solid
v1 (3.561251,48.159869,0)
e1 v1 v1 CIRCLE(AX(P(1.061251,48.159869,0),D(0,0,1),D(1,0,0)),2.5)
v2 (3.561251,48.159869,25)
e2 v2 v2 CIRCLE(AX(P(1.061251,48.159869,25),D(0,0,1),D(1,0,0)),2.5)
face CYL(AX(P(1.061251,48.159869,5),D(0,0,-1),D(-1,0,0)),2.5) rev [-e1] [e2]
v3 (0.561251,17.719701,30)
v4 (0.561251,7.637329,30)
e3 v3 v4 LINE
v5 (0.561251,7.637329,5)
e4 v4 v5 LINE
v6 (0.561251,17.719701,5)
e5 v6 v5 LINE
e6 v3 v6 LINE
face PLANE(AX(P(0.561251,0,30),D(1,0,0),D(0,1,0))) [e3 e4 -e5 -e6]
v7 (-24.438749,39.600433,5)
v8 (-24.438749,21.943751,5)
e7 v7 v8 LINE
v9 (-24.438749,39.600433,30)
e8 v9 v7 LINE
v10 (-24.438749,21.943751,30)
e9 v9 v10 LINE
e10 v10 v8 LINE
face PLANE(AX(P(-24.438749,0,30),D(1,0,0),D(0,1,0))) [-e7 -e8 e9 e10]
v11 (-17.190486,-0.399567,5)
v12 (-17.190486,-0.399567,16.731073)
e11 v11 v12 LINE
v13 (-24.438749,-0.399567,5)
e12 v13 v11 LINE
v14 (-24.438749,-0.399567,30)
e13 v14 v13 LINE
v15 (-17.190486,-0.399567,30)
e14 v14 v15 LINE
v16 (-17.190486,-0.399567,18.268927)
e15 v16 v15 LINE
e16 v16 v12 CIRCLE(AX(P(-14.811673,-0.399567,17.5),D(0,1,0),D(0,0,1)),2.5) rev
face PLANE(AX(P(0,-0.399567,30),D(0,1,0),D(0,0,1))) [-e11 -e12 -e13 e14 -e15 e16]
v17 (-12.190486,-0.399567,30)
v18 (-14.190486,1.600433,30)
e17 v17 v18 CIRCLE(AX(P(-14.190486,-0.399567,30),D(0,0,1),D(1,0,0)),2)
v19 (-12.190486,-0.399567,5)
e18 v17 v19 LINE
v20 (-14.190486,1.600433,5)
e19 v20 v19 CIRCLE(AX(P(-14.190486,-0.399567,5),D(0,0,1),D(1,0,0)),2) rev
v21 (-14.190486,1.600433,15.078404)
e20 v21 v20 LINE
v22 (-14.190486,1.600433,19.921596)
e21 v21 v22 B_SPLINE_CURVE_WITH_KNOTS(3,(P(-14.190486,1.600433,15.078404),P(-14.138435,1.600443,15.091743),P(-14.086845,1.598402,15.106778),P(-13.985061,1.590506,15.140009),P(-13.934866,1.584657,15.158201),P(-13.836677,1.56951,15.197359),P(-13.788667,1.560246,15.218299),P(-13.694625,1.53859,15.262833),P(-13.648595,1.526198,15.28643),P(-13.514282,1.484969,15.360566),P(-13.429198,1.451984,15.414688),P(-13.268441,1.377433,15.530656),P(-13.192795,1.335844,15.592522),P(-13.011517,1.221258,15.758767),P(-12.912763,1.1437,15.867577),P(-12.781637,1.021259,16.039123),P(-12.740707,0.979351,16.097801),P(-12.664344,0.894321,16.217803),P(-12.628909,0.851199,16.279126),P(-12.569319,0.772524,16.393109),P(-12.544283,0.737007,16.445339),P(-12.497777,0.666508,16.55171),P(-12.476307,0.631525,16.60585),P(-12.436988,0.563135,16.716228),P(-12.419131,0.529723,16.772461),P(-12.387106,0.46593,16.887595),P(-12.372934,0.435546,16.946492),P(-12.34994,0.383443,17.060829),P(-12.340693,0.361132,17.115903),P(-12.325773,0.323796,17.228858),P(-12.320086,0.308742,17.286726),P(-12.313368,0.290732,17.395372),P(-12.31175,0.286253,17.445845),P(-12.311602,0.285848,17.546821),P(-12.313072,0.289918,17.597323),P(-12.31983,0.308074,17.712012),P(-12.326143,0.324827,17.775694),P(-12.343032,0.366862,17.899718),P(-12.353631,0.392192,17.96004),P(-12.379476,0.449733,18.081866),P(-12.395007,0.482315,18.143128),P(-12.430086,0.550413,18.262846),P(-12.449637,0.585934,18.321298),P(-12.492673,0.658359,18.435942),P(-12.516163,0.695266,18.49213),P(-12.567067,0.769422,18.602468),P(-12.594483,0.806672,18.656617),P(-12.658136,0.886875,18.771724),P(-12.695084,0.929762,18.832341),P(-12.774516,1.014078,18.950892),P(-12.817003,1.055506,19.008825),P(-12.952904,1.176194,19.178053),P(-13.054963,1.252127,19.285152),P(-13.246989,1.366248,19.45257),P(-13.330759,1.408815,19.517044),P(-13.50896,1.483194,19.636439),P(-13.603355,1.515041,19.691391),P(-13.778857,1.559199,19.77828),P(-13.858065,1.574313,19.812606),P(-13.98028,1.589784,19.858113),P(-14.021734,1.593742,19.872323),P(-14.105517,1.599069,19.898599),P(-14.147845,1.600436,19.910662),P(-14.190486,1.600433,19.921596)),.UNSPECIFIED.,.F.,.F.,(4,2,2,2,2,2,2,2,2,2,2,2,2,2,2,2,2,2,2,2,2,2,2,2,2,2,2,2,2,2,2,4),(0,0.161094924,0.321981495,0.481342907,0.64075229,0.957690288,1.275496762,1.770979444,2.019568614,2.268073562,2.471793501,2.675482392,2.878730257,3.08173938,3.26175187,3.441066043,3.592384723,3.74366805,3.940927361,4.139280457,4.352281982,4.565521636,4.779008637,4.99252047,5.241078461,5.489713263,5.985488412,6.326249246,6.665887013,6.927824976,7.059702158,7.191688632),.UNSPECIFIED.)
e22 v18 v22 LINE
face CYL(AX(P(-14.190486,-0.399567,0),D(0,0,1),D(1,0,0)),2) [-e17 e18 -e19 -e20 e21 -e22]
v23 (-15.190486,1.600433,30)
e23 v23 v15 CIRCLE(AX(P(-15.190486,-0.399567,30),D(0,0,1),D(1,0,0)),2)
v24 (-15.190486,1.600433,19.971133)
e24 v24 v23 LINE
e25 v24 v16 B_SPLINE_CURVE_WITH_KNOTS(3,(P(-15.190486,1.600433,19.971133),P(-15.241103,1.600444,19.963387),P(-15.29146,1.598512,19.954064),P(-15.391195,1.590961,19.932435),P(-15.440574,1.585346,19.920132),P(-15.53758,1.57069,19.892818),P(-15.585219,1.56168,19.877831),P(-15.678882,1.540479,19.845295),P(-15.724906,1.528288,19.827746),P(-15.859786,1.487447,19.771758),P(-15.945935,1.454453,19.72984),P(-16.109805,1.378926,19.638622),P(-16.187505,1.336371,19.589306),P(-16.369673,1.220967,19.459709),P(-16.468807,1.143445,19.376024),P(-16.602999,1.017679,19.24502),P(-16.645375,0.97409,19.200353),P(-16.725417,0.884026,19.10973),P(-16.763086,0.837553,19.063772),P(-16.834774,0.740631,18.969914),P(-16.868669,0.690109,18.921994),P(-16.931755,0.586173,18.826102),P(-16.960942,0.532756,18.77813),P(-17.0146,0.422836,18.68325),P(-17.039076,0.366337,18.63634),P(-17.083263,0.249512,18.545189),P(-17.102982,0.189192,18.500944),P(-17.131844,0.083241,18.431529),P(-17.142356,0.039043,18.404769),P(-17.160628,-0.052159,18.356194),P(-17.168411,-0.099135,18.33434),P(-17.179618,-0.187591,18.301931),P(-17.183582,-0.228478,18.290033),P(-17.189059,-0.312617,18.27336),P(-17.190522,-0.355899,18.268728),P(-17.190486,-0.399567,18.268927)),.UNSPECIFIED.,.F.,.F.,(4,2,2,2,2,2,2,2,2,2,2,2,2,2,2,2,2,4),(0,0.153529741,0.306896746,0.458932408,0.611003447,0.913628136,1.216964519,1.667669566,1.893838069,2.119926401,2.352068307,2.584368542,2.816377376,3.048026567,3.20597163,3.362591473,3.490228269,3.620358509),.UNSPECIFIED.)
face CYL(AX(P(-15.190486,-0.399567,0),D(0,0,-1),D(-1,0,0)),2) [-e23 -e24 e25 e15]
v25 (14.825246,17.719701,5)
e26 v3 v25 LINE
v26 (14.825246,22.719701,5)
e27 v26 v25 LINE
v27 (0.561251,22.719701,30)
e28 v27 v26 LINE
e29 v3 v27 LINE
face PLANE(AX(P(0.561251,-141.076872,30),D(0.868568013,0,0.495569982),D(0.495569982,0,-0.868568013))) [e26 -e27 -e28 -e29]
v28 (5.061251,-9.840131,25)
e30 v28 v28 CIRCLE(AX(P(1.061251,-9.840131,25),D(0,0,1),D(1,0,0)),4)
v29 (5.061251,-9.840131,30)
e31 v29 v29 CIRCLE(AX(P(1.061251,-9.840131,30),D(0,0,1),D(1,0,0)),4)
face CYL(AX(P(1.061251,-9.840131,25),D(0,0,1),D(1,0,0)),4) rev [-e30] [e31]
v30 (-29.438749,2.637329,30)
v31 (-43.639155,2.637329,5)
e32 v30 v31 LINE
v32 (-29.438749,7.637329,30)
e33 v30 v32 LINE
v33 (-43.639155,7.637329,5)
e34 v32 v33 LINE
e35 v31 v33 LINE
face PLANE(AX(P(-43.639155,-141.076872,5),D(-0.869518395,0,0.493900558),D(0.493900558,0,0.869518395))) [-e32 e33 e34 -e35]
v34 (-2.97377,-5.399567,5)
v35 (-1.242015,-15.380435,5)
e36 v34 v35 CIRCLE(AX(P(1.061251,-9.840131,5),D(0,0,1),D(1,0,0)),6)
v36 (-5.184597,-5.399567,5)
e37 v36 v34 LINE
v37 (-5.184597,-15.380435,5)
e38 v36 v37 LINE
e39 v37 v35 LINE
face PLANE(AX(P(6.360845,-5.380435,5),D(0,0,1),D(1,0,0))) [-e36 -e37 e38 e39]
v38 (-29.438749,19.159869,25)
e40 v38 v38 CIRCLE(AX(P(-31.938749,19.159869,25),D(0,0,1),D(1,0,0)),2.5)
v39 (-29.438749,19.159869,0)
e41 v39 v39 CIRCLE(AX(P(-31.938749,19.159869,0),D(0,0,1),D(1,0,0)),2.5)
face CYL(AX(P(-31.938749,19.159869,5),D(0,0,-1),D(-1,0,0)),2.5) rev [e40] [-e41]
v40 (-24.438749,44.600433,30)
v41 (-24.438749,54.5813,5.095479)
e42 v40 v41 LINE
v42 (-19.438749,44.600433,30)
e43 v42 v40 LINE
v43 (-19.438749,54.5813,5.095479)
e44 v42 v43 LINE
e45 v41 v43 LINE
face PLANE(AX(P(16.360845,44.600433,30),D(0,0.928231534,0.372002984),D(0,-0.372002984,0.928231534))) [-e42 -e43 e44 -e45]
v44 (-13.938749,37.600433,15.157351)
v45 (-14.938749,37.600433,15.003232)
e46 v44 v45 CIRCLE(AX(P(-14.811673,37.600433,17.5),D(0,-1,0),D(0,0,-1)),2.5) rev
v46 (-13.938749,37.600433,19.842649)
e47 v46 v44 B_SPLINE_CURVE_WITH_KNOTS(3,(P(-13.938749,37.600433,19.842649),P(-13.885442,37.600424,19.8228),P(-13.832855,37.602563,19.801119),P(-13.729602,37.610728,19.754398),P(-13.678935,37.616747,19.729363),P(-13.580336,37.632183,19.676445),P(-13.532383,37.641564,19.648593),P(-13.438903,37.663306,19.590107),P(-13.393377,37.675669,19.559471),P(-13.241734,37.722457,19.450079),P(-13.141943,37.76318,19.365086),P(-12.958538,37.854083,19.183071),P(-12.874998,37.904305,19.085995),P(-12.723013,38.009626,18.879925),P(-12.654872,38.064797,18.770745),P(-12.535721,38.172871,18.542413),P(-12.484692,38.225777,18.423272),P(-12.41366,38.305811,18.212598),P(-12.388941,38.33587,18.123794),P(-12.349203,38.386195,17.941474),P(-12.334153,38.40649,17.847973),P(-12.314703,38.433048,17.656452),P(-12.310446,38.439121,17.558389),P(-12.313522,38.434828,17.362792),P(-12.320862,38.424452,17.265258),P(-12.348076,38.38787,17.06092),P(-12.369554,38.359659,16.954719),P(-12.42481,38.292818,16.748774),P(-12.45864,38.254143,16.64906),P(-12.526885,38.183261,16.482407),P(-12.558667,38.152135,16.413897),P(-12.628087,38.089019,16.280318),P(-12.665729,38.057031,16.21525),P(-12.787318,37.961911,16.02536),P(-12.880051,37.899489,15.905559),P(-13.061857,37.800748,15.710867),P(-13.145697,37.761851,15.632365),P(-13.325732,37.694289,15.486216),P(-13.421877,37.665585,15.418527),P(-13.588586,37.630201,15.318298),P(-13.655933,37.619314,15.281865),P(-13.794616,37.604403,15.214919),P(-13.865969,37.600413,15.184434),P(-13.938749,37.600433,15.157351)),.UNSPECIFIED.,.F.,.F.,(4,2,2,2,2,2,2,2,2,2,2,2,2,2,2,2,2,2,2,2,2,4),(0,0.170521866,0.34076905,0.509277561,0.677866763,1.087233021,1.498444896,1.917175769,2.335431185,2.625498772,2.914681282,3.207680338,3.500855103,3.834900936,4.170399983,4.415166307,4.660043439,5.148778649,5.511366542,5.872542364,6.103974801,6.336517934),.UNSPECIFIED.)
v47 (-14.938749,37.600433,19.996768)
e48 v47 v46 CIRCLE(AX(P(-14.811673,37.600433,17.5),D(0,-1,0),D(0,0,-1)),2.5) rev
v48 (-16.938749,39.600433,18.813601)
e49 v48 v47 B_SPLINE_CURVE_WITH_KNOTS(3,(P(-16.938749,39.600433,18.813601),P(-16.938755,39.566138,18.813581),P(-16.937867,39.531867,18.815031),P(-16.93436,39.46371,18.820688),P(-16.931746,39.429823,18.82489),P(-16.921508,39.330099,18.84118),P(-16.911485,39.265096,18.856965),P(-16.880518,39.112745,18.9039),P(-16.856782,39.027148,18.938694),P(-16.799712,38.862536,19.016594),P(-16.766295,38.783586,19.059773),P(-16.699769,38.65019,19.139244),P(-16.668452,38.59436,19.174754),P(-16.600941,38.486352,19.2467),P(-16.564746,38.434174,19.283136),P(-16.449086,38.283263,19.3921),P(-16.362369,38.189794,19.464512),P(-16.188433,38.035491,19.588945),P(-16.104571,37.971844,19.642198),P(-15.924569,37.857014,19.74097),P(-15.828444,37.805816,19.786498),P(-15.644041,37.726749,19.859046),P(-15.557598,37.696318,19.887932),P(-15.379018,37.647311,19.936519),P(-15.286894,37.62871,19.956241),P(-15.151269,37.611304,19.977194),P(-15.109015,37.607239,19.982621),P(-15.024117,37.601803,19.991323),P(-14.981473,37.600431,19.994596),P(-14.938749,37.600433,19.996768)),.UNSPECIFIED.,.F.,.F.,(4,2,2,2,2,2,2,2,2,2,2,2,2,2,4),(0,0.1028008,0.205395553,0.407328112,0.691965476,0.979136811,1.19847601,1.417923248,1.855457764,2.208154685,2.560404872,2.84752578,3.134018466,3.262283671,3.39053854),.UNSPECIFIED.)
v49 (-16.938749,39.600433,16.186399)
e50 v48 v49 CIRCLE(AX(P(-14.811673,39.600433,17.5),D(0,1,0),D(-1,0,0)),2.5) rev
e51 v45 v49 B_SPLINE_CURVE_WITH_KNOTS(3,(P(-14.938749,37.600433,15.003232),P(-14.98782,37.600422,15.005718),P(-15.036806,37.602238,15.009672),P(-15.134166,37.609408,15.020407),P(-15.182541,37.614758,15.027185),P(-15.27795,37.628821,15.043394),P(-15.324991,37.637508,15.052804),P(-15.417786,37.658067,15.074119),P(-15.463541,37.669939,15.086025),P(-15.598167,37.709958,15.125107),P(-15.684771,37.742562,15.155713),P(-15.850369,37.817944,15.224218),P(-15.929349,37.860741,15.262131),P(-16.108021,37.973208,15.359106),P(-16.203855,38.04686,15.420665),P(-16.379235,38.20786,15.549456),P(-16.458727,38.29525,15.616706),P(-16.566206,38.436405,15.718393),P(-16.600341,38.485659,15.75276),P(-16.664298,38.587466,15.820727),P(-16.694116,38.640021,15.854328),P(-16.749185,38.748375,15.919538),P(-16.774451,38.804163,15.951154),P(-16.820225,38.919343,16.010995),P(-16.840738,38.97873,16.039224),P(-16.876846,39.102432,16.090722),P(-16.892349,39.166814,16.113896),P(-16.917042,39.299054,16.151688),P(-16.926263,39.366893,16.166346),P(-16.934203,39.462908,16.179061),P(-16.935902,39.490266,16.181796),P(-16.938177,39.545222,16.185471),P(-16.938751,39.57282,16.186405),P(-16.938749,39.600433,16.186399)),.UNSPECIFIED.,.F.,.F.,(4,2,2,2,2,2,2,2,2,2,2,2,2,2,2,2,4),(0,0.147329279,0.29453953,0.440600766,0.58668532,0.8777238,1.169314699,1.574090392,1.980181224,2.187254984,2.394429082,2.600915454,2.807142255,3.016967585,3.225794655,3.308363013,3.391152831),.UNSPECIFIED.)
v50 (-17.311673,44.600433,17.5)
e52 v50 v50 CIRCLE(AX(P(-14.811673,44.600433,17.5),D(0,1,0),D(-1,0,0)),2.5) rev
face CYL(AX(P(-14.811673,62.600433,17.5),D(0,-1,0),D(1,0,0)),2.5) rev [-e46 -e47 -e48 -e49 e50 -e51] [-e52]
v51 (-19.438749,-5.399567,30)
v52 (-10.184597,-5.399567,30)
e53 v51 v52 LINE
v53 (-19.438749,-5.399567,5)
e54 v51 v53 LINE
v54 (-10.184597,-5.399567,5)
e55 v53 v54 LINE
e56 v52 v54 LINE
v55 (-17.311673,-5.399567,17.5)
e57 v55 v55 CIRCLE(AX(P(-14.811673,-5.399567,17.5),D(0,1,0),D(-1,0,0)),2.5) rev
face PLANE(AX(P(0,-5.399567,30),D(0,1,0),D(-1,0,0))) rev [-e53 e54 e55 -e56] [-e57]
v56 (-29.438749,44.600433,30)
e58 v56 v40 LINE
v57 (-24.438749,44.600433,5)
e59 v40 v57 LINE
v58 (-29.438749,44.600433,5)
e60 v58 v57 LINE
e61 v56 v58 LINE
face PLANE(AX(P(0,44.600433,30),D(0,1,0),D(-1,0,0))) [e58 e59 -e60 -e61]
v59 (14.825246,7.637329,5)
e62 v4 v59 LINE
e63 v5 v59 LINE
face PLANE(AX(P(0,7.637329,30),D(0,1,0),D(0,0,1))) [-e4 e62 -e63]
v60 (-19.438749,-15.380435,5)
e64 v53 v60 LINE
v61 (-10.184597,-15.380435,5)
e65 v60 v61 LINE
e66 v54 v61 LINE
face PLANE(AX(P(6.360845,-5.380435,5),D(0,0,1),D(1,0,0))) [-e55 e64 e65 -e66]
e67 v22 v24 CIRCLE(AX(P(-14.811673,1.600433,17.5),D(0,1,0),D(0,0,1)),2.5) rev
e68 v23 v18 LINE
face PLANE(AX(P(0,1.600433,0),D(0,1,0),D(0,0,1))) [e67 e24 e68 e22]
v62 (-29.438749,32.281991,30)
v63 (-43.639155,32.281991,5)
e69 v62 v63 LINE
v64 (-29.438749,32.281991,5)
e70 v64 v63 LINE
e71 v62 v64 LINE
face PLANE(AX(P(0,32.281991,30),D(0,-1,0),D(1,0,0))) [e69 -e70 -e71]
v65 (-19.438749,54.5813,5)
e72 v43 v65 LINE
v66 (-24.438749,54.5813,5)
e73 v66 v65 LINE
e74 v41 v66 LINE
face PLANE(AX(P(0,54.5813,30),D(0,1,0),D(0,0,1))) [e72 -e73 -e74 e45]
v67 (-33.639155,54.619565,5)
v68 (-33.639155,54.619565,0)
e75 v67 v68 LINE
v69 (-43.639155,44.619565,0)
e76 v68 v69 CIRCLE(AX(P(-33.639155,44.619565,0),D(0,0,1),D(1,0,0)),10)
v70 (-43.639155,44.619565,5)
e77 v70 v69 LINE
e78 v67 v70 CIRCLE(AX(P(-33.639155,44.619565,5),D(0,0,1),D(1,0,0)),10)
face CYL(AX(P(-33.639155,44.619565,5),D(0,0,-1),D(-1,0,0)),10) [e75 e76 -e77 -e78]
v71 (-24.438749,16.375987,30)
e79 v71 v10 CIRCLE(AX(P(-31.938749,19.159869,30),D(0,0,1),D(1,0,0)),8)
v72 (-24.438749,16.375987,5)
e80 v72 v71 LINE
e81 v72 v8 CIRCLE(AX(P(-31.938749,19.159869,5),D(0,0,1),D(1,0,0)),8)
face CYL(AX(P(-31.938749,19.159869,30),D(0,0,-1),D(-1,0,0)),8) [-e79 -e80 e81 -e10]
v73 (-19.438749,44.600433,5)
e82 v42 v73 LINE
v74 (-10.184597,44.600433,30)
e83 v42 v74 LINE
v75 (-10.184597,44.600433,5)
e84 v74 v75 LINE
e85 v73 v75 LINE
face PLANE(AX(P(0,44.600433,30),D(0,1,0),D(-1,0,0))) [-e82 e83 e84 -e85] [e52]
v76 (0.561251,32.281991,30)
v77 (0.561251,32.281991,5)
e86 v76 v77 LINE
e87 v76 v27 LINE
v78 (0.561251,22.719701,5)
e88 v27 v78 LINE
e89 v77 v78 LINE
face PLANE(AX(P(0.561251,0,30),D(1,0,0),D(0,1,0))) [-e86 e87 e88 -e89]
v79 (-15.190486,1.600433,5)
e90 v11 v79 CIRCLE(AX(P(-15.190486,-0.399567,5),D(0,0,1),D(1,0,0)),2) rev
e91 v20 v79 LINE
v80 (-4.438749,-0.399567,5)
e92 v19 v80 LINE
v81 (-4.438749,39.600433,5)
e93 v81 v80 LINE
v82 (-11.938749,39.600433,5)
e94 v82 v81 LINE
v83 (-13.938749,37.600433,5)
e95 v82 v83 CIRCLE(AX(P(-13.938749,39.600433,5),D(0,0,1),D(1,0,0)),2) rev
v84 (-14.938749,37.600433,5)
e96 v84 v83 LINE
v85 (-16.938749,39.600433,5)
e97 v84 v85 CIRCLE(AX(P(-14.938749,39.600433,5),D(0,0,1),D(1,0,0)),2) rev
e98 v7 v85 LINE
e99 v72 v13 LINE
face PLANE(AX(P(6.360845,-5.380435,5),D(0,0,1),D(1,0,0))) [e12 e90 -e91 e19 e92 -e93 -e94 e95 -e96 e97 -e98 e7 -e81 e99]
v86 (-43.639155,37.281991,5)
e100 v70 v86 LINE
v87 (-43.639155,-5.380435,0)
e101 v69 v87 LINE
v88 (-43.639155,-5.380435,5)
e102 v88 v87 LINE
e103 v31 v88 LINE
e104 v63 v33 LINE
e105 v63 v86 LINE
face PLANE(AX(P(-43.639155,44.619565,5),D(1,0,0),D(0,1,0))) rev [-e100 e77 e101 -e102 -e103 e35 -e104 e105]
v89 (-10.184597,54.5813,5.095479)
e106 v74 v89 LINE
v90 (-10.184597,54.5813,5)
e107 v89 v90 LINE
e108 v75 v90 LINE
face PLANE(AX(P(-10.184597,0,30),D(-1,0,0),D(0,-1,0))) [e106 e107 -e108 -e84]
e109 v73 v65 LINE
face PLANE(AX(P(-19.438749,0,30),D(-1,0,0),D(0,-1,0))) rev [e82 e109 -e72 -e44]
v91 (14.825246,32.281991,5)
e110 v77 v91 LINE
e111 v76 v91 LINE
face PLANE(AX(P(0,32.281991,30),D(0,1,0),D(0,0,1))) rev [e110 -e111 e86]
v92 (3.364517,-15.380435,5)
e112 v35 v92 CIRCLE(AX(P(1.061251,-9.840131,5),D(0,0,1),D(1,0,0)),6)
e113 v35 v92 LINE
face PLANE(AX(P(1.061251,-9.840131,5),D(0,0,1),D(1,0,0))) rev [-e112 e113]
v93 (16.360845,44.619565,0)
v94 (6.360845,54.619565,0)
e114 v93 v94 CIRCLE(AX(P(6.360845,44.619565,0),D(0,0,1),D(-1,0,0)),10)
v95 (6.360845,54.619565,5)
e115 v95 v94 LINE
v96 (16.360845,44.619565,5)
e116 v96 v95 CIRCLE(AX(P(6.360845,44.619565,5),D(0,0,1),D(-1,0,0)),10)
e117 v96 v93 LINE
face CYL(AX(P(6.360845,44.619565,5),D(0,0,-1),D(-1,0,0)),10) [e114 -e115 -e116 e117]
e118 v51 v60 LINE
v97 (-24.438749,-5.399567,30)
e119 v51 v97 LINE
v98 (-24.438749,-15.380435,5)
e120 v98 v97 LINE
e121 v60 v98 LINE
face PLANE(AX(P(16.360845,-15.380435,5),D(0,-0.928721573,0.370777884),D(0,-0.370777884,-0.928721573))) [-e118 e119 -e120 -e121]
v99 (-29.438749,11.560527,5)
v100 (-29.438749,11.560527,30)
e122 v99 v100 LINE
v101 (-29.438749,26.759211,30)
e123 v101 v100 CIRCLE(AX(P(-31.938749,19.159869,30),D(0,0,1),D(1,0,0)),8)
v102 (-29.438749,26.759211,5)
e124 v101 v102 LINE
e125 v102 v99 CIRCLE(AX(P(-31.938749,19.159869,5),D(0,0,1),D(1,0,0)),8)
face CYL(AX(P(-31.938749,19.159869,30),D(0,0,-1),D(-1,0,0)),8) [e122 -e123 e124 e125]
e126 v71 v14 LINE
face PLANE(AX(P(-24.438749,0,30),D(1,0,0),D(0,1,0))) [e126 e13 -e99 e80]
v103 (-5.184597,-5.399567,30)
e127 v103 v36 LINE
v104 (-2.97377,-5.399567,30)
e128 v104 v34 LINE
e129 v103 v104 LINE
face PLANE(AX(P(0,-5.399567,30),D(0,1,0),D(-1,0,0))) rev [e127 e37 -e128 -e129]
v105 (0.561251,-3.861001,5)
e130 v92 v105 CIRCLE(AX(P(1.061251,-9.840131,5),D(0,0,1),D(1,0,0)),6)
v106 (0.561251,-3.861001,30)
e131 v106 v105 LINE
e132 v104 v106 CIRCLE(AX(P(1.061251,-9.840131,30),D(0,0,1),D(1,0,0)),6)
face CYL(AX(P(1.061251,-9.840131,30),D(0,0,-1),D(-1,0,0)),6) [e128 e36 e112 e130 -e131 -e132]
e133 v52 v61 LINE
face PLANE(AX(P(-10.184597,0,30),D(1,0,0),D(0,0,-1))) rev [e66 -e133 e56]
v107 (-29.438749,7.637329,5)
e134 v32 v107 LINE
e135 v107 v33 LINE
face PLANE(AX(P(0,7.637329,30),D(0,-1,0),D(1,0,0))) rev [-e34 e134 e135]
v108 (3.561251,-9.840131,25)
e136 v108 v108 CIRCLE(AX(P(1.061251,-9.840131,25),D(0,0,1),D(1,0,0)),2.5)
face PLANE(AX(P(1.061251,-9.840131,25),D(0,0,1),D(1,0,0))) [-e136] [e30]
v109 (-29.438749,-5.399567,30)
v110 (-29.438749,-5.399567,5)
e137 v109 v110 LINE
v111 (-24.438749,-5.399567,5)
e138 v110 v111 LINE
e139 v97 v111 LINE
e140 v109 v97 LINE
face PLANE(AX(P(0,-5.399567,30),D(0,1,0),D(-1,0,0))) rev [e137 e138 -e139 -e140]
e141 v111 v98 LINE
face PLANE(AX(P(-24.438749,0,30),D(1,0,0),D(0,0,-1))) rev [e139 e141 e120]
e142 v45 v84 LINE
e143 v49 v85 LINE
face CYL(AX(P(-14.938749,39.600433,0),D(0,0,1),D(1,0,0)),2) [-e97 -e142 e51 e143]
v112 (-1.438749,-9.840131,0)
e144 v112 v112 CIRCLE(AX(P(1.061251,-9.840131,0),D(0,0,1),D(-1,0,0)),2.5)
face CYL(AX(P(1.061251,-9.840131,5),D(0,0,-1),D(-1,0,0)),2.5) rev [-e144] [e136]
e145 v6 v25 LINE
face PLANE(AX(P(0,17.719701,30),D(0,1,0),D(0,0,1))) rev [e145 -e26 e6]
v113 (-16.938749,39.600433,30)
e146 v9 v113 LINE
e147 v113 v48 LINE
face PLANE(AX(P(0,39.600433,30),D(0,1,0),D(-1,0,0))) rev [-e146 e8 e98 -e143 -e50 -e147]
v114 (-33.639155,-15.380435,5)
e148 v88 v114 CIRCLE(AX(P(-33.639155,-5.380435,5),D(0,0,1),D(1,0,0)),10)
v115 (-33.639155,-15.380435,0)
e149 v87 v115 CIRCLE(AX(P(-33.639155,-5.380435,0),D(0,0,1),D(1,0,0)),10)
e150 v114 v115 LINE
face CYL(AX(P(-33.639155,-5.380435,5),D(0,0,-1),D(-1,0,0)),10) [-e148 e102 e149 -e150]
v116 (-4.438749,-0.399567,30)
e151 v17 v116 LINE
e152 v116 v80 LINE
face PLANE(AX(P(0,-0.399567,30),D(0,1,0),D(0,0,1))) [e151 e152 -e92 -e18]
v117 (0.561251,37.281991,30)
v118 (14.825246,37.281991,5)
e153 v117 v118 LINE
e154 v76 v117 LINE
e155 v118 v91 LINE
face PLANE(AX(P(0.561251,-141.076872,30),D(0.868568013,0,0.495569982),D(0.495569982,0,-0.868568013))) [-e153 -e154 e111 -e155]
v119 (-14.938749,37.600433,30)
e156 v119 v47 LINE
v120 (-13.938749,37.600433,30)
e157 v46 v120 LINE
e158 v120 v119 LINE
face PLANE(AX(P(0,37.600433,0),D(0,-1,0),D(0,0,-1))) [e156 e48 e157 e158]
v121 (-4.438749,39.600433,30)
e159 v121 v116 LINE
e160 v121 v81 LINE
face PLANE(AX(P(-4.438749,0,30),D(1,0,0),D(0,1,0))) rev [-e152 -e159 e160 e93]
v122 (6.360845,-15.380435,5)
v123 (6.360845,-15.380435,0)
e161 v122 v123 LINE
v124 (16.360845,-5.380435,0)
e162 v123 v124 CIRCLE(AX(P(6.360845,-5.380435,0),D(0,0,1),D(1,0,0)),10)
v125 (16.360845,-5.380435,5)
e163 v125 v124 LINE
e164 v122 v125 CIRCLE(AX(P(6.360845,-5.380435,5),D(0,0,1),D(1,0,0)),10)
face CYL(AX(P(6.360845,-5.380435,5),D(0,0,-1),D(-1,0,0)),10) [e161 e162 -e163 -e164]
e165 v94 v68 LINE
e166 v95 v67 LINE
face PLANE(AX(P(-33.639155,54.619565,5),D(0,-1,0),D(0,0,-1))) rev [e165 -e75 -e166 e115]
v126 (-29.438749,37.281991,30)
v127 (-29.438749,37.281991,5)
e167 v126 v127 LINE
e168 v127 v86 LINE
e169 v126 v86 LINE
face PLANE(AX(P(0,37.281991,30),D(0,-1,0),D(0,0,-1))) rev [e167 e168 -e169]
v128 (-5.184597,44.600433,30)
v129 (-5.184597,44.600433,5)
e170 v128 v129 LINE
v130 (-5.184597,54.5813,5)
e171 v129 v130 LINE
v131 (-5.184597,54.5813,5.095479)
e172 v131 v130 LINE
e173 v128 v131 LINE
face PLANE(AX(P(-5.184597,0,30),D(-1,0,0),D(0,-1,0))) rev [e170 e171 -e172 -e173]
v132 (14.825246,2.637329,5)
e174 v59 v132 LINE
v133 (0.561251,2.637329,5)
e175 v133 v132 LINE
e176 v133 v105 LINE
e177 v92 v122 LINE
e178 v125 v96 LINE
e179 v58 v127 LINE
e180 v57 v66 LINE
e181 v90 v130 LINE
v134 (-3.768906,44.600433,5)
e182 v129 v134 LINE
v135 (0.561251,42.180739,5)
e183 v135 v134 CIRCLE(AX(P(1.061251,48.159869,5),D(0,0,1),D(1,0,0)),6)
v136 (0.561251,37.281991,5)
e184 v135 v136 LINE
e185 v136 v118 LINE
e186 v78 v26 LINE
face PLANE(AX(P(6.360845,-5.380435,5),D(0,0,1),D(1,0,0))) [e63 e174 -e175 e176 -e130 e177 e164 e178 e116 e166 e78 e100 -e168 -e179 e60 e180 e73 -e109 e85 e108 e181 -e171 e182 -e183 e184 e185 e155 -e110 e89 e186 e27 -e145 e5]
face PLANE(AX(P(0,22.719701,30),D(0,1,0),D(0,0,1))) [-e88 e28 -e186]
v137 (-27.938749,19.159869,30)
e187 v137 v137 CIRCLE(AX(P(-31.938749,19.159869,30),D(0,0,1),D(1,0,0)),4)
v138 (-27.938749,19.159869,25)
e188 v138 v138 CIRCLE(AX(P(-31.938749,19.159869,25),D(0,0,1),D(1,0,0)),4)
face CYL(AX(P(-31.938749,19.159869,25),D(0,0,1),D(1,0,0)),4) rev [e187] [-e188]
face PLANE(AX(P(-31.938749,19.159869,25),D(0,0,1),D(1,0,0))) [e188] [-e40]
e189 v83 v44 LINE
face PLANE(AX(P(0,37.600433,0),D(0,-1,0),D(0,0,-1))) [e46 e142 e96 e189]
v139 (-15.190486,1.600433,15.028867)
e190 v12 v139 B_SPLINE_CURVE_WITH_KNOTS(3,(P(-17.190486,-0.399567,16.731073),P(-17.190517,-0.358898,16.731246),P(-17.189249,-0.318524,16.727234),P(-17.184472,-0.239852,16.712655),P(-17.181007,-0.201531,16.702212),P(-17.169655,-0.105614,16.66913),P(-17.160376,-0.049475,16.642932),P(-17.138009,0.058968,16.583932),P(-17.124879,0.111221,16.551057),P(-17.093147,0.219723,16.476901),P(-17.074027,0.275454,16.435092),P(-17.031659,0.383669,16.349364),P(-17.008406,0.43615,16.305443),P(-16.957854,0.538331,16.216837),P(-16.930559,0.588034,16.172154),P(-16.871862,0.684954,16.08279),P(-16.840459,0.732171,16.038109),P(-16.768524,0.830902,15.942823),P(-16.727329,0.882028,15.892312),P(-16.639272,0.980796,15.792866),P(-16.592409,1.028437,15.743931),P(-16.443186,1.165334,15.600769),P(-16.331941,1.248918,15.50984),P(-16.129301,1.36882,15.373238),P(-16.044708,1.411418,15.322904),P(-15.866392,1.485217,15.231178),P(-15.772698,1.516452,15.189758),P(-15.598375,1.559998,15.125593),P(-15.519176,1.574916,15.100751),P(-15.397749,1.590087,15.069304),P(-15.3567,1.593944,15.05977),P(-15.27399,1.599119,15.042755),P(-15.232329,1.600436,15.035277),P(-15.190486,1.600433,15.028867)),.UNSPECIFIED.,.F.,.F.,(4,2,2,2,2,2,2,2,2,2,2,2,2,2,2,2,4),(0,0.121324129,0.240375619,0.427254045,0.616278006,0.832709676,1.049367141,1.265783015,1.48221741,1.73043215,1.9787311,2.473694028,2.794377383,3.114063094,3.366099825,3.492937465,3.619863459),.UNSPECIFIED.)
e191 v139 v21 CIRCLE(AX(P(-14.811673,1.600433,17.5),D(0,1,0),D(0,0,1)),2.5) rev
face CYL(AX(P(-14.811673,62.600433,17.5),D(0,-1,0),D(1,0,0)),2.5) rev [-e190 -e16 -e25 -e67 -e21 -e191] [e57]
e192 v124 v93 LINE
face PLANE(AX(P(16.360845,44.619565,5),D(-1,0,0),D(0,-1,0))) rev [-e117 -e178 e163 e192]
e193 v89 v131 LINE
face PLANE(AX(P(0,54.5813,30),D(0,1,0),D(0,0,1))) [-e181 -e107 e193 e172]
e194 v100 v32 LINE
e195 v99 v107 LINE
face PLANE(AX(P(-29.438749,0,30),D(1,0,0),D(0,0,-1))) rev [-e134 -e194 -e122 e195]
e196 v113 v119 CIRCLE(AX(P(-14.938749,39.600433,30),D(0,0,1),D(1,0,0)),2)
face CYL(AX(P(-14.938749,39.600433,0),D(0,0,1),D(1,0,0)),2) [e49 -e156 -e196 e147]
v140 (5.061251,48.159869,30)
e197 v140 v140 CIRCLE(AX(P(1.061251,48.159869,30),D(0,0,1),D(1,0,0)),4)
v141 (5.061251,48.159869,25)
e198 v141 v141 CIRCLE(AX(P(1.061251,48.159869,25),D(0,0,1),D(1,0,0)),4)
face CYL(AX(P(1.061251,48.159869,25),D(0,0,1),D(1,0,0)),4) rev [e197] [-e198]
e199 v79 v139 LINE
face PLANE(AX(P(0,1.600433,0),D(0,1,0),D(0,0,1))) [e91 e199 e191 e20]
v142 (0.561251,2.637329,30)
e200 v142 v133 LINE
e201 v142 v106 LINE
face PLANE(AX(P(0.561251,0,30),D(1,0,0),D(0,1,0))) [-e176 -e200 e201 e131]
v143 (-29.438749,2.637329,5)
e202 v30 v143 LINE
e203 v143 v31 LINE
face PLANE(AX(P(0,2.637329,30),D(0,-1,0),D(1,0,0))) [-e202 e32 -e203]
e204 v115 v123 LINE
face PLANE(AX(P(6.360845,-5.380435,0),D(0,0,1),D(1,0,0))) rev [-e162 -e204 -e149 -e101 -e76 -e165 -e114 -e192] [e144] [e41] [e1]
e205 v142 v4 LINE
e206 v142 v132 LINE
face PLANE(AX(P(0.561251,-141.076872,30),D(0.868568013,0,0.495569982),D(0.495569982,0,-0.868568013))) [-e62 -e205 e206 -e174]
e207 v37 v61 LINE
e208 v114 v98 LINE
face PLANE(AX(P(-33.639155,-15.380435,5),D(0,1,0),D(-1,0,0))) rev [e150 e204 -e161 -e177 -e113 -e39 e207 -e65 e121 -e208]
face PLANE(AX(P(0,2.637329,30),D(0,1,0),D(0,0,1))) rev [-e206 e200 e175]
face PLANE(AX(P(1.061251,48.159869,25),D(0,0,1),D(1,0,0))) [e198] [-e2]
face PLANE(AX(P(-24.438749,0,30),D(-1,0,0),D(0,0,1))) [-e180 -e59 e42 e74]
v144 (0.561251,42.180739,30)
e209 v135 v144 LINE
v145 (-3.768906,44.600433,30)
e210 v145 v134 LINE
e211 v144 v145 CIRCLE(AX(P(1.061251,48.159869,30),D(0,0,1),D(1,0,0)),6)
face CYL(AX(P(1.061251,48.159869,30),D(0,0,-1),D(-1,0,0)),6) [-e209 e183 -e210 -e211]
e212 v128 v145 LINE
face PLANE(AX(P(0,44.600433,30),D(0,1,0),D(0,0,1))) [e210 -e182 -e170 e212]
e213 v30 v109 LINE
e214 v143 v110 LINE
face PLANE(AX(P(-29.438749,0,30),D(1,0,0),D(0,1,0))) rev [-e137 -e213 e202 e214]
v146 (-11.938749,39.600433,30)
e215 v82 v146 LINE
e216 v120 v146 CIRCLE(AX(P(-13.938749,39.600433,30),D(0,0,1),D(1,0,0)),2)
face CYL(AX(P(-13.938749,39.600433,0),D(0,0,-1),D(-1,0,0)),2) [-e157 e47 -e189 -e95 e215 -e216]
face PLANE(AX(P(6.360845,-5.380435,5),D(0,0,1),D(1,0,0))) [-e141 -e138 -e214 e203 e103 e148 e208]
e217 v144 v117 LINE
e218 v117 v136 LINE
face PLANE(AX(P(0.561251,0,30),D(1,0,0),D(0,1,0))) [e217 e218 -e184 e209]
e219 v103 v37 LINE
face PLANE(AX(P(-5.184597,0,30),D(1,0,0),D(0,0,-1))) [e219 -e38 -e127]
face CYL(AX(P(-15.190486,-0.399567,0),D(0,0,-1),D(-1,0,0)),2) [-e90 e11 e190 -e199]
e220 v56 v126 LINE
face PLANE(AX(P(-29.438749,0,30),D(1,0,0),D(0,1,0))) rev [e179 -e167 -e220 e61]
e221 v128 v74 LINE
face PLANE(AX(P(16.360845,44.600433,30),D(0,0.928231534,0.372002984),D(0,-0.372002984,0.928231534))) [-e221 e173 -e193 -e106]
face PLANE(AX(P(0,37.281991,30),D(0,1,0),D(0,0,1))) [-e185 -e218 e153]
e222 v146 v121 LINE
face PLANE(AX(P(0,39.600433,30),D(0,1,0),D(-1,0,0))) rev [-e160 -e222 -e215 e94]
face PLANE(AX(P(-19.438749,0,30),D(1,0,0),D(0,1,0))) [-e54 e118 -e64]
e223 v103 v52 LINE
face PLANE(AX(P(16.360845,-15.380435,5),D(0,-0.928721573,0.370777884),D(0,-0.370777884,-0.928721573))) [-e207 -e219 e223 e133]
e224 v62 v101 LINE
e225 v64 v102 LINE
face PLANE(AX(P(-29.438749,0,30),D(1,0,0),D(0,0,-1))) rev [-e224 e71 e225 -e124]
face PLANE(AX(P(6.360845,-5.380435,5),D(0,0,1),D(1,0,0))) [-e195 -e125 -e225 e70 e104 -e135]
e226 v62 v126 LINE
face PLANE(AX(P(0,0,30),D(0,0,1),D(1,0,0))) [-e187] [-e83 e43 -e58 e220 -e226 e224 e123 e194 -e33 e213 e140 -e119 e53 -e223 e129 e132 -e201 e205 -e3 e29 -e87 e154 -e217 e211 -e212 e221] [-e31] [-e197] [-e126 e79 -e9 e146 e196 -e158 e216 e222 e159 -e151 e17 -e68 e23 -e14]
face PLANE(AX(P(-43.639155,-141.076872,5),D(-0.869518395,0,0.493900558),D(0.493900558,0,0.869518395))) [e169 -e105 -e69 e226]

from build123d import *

# Parameters (mm, degrees)
SKETCH1_R                = 2.5
BOSS_EXTRUDE1_DEPTH      = 5
SKETCH3_W                = 20
SKETCH3_H                = 40
BOSS_EXTRUDE5_DEPTH      = 25
CUT_EXTRUDE2_DEPTH       = 75.20598847
CUT_EXTRUDE2_DEPTH_BACK  = 75.20598847
CUT_EXTRUDE_THIN13_DEPTH = 75.484252037
SKETCH8_W                = 5
SKETCH8_H                = 25
BOSS_EXTRUDE6_DEPTH      = 2
FILLET3_R                = 2
SKETCH9_W                = 5
SKETCH9_H                = 25
BOSS_EXTRUDE7_DEPTH      = 2
FILLET4_R                = 2
SKETCH11_R               = 4.5
CUT_EXTRUDE4_DEPTH       = 25
SKETCH12_R               = 6
SKETCH12_R_2             = 8
BOSS_EXTRUDE8_DEPTH      = 25
SKETCH13_R               = 2.5
CUT_EXTRUDE5_DEPTH       = 28
SKETCH14_R               = 4
CUT_EXTRUDE6_DEPTH       = 5
CUT_EXTRUDE7_DEPTH       = 18
CUT_EXTRUDE7_DEPTH_BACK  = 70
SKETCH15_R               = 2.5


with BuildPart() as part:
    # Sketch1 → Boss-Extrude1 (new body)
    with BuildSketch(Plane.XY):
        with BuildLine():
            Line((-33.639154819, 54.619565217), (6.360845181, 54.619565217))
            ThreePointArc((6.360845181, 54.619565217), (13.431912992, 51.690633029), (16.360845181, 44.619565217))
            Line((16.360845181, 44.619565217), (16.360845181, -5.380434783))
            ThreePointArc((16.360845181, -5.380434783), (13.431912992, -12.451502594), (6.360845181, -15.380434783))
            Line((6.360845181, -15.380434783), (-33.639154819, -15.380434783))
            ThreePointArc((-33.639154819, -15.380434783), (-40.710222631, -12.451502594), (-43.639154819, -5.380434783))
            Line((-43.639154819, -5.380434783), (-43.639154819, 44.619565217))
            ThreePointArc((-43.639154819, 44.619565217), (-40.710222631, 51.690633029), (-33.639154819, 54.619565217))
        make_face()
        with Locations((1.061250856, 48.159869042)):
            Circle(SKETCH1_R, mode=Mode.SUBTRACT)
        with Locations(Location((1.061250856, -9.840130958, 0), (0, 0, 180))):
            Circle(SKETCH1_R, mode=Mode.SUBTRACT)
        with Locations((-31.938749144, 19.159869042)):
            Circle(SKETCH1_R, mode=Mode.SUBTRACT)
    extrude(amount=BOSS_EXTRUDE1_DEPTH)

    # Sketch3 → Boss-Extrude5 (add)
    with BuildSketch(Plane.XY.offset(5)):
        Polygon((-24.438749144, 44.600432852), (-29.438749144, 44.600432852), (-29.438749144, 37.28199121), (-43.639154819, 37.28199121), (-43.639154819, 32.28199121), (-29.438749144, 32.28199121), (-29.438749144, 7.637328911), (-43.639154819, 7.637328911), (-43.639154819, 2.637328911), (-29.438749144, 2.637328911), (-29.438749144, -5.399567148), (-24.438749144, -5.399567148), (-24.438749144, -15.380434783), (-19.438749144, -15.380434783), (-19.438749144, -5.399567148), (-10.184597354, -5.399567148), (-10.184597354, -15.380434783), (-5.184597354, -15.380434783), (-5.184597354, -5.399567148), (0.561250856, -5.399567148), (0.561250856, 2.637328911), (14.825245568, 2.637328911), (14.825245568, 7.637328911), (0.561250856, 7.637328911), (0.561250856, 17.719700958), (14.825245568, 17.719700958), (14.825245568, 22.719700958), (0.561250856, 22.719700958), (0.561250856, 32.28199121), (14.825245568, 32.28199121), (14.825245568, 37.28199121), (0.561250856, 37.28199121), (0.561250856, 44.600432852), (-5.184597354, 44.600432852), (-5.184597354, 54.581300487), (-10.184597354, 54.581300487), (-10.184597354, 44.600432852), (-19.438749144, 44.600432852), (-19.438749144, 54.581300487), (-24.438749144, 54.581300487), align=None)
        with Locations((-14.438749144, 19.600432852)):
            Rectangle(SKETCH3_W, SKETCH3_H, mode=Mode.SUBTRACT)
    extrude(amount=BOSS_EXTRUDE5_DEPTH)

    # Sketch5 → Cut-Extrude2 (cut, two sides: drawn at the far end of the back side and taken through both)
    with BuildSketch(Plane.XZ.offset(-2.637328911).offset(-CUT_EXTRUDE2_DEPTH_BACK)):
        Polygon((-43.639154819, 30), (-43.639154819, 5), (-29.438749144, 30), align=None)
        Polygon((14.825245568, 30), (0.561250856, 30), (14.825245568, 5), align=None)
    extrude(amount=CUT_EXTRUDE2_DEPTH + CUT_EXTRUDE2_DEPTH_BACK, mode=Mode.SUBTRACT)

    # Sketch7 → Cut-Extrude-Thin13 (cut, through all)
    with BuildSketch(Plane.ZY.offset(24.438749144)):
        Polygon((30, 44.600432852), (5, 54.619565217), (8.72002984, 63.901880553), (33.72002984, 53.882748188), align=None)
        Polygon((5, -15.380434783), (30, -5.399567148), (33.707778838, -14.686782882), (8.707778838, -24.667650517), align=None)
    extrude(amount=-CUT_EXTRUDE_THIN13_DEPTH, mode=Mode.SUBTRACT)

    # Sketch8 → Boss-Extrude6 (add)
    with BuildSketch(Plane.XZ.offset(-39.600432852)):
        with Locations((-14.438749144, 17.5)):
            Rectangle(SKETCH8_W, SKETCH8_H)
    extrude(amount=BOSS_EXTRUDE6_DEPTH)

    # Fillet3
    fillet3_edges = [part.edges().sort_by_distance(p)[0] for p in [
        (-16.938749144, 37.600432852, 17.5),
        (-11.938749144, 37.600432852, 17.5),
    ]]
    fillet(fillet3_edges, radius=FILLET3_R - 0.0001)  # a hair under: the kernel refuses the full size

    # Sketch9 → Boss-Extrude7 (add)
    with BuildSketch(Plane(origin=(0, -0.399567148, 0), x_dir=(1, 0, 0), z_dir=(0, 1, 0))):
        with Locations((-14.690486301, -17.5)):
            Rectangle(SKETCH9_W, SKETCH9_H)
    extrude(amount=BOSS_EXTRUDE7_DEPTH)

    # Fillet4
    fillet4_edges = [part.edges().sort_by_distance(p)[0] for p in [
        (-12.190486301, 1.600432852, 17.5),
        (-17.190486301, 1.600432852, 17.5),
    ]]
    fillet(fillet4_edges, radius=FILLET4_R - 0.0001)  # a hair under: the kernel refuses the full size

    # Sketch11 → Cut-Extrude4 (cut)
    with BuildSketch(Plane.XY.offset(30)):
        with Locations((-31.938749144, 19.159869042)):
            Circle(SKETCH11_R)
    extrude(amount=-CUT_EXTRUDE4_DEPTH, mode=Mode.SUBTRACT)

    # Sketch12 → Boss-Extrude8 (add)
    with BuildSketch(Plane.XY.offset(5)):
        with Locations((1.061250856, 48.159869042)):
            Circle(SKETCH12_R)
        with Locations((1.061250856, -9.840130958)):
            Circle(SKETCH12_R)
        with Locations((-31.938749144, 19.159869042)):
            Circle(SKETCH12_R_2)
    extrude(amount=BOSS_EXTRUDE8_DEPTH)

    # Sketch13 → Cut-Extrude5 (cut)
    with BuildSketch(Plane(origin=(0, 0, 0), x_dir=(-1, 0, 0), z_dir=(0, 0, -1))):
        with Locations((31.938749144, 19.159869042)):
            Circle(SKETCH13_R)
        with Locations((-1.061250856, -9.840130958)):
            Circle(SKETCH13_R)
        with Locations((-1.061250856, 48.159869042)):
            Circle(SKETCH13_R)
    extrude(amount=-CUT_EXTRUDE5_DEPTH, mode=Mode.SUBTRACT)

    # Sketch14 → Cut-Extrude6 (cut)
    with BuildSketch(Plane.XY.offset(30)):
        with Locations((-31.938749144, 19.159869042)):
            Circle(SKETCH14_R)
        with Locations((1.061250856, 48.159869042)):
            Circle(SKETCH14_R)
        with Locations((1.061250856, -9.840130958)):
            Circle(SKETCH14_R)
    extrude(amount=-CUT_EXTRUDE6_DEPTH, mode=Mode.SUBTRACT)

    # Sketch15 → Cut-Extrude7 (cut, two sides: drawn at the far end of the back side and taken through both)
    with BuildSketch(Plane(origin=(0, 44.600432852, 0), x_dir=(1, 0, 0), z_dir=(0, 1, 0)).offset(-CUT_EXTRUDE7_DEPTH_BACK)):
        with Locations(Location((-14.811673249, -17.5, 0), (0, 0, 75.612724185))):
            Circle(SKETCH15_R)
    extrude(amount=CUT_EXTRUDE7_DEPTH + CUT_EXTRUDE7_DEPTH_BACK, mode=Mode.SUBTRACT)


solid = part.part
